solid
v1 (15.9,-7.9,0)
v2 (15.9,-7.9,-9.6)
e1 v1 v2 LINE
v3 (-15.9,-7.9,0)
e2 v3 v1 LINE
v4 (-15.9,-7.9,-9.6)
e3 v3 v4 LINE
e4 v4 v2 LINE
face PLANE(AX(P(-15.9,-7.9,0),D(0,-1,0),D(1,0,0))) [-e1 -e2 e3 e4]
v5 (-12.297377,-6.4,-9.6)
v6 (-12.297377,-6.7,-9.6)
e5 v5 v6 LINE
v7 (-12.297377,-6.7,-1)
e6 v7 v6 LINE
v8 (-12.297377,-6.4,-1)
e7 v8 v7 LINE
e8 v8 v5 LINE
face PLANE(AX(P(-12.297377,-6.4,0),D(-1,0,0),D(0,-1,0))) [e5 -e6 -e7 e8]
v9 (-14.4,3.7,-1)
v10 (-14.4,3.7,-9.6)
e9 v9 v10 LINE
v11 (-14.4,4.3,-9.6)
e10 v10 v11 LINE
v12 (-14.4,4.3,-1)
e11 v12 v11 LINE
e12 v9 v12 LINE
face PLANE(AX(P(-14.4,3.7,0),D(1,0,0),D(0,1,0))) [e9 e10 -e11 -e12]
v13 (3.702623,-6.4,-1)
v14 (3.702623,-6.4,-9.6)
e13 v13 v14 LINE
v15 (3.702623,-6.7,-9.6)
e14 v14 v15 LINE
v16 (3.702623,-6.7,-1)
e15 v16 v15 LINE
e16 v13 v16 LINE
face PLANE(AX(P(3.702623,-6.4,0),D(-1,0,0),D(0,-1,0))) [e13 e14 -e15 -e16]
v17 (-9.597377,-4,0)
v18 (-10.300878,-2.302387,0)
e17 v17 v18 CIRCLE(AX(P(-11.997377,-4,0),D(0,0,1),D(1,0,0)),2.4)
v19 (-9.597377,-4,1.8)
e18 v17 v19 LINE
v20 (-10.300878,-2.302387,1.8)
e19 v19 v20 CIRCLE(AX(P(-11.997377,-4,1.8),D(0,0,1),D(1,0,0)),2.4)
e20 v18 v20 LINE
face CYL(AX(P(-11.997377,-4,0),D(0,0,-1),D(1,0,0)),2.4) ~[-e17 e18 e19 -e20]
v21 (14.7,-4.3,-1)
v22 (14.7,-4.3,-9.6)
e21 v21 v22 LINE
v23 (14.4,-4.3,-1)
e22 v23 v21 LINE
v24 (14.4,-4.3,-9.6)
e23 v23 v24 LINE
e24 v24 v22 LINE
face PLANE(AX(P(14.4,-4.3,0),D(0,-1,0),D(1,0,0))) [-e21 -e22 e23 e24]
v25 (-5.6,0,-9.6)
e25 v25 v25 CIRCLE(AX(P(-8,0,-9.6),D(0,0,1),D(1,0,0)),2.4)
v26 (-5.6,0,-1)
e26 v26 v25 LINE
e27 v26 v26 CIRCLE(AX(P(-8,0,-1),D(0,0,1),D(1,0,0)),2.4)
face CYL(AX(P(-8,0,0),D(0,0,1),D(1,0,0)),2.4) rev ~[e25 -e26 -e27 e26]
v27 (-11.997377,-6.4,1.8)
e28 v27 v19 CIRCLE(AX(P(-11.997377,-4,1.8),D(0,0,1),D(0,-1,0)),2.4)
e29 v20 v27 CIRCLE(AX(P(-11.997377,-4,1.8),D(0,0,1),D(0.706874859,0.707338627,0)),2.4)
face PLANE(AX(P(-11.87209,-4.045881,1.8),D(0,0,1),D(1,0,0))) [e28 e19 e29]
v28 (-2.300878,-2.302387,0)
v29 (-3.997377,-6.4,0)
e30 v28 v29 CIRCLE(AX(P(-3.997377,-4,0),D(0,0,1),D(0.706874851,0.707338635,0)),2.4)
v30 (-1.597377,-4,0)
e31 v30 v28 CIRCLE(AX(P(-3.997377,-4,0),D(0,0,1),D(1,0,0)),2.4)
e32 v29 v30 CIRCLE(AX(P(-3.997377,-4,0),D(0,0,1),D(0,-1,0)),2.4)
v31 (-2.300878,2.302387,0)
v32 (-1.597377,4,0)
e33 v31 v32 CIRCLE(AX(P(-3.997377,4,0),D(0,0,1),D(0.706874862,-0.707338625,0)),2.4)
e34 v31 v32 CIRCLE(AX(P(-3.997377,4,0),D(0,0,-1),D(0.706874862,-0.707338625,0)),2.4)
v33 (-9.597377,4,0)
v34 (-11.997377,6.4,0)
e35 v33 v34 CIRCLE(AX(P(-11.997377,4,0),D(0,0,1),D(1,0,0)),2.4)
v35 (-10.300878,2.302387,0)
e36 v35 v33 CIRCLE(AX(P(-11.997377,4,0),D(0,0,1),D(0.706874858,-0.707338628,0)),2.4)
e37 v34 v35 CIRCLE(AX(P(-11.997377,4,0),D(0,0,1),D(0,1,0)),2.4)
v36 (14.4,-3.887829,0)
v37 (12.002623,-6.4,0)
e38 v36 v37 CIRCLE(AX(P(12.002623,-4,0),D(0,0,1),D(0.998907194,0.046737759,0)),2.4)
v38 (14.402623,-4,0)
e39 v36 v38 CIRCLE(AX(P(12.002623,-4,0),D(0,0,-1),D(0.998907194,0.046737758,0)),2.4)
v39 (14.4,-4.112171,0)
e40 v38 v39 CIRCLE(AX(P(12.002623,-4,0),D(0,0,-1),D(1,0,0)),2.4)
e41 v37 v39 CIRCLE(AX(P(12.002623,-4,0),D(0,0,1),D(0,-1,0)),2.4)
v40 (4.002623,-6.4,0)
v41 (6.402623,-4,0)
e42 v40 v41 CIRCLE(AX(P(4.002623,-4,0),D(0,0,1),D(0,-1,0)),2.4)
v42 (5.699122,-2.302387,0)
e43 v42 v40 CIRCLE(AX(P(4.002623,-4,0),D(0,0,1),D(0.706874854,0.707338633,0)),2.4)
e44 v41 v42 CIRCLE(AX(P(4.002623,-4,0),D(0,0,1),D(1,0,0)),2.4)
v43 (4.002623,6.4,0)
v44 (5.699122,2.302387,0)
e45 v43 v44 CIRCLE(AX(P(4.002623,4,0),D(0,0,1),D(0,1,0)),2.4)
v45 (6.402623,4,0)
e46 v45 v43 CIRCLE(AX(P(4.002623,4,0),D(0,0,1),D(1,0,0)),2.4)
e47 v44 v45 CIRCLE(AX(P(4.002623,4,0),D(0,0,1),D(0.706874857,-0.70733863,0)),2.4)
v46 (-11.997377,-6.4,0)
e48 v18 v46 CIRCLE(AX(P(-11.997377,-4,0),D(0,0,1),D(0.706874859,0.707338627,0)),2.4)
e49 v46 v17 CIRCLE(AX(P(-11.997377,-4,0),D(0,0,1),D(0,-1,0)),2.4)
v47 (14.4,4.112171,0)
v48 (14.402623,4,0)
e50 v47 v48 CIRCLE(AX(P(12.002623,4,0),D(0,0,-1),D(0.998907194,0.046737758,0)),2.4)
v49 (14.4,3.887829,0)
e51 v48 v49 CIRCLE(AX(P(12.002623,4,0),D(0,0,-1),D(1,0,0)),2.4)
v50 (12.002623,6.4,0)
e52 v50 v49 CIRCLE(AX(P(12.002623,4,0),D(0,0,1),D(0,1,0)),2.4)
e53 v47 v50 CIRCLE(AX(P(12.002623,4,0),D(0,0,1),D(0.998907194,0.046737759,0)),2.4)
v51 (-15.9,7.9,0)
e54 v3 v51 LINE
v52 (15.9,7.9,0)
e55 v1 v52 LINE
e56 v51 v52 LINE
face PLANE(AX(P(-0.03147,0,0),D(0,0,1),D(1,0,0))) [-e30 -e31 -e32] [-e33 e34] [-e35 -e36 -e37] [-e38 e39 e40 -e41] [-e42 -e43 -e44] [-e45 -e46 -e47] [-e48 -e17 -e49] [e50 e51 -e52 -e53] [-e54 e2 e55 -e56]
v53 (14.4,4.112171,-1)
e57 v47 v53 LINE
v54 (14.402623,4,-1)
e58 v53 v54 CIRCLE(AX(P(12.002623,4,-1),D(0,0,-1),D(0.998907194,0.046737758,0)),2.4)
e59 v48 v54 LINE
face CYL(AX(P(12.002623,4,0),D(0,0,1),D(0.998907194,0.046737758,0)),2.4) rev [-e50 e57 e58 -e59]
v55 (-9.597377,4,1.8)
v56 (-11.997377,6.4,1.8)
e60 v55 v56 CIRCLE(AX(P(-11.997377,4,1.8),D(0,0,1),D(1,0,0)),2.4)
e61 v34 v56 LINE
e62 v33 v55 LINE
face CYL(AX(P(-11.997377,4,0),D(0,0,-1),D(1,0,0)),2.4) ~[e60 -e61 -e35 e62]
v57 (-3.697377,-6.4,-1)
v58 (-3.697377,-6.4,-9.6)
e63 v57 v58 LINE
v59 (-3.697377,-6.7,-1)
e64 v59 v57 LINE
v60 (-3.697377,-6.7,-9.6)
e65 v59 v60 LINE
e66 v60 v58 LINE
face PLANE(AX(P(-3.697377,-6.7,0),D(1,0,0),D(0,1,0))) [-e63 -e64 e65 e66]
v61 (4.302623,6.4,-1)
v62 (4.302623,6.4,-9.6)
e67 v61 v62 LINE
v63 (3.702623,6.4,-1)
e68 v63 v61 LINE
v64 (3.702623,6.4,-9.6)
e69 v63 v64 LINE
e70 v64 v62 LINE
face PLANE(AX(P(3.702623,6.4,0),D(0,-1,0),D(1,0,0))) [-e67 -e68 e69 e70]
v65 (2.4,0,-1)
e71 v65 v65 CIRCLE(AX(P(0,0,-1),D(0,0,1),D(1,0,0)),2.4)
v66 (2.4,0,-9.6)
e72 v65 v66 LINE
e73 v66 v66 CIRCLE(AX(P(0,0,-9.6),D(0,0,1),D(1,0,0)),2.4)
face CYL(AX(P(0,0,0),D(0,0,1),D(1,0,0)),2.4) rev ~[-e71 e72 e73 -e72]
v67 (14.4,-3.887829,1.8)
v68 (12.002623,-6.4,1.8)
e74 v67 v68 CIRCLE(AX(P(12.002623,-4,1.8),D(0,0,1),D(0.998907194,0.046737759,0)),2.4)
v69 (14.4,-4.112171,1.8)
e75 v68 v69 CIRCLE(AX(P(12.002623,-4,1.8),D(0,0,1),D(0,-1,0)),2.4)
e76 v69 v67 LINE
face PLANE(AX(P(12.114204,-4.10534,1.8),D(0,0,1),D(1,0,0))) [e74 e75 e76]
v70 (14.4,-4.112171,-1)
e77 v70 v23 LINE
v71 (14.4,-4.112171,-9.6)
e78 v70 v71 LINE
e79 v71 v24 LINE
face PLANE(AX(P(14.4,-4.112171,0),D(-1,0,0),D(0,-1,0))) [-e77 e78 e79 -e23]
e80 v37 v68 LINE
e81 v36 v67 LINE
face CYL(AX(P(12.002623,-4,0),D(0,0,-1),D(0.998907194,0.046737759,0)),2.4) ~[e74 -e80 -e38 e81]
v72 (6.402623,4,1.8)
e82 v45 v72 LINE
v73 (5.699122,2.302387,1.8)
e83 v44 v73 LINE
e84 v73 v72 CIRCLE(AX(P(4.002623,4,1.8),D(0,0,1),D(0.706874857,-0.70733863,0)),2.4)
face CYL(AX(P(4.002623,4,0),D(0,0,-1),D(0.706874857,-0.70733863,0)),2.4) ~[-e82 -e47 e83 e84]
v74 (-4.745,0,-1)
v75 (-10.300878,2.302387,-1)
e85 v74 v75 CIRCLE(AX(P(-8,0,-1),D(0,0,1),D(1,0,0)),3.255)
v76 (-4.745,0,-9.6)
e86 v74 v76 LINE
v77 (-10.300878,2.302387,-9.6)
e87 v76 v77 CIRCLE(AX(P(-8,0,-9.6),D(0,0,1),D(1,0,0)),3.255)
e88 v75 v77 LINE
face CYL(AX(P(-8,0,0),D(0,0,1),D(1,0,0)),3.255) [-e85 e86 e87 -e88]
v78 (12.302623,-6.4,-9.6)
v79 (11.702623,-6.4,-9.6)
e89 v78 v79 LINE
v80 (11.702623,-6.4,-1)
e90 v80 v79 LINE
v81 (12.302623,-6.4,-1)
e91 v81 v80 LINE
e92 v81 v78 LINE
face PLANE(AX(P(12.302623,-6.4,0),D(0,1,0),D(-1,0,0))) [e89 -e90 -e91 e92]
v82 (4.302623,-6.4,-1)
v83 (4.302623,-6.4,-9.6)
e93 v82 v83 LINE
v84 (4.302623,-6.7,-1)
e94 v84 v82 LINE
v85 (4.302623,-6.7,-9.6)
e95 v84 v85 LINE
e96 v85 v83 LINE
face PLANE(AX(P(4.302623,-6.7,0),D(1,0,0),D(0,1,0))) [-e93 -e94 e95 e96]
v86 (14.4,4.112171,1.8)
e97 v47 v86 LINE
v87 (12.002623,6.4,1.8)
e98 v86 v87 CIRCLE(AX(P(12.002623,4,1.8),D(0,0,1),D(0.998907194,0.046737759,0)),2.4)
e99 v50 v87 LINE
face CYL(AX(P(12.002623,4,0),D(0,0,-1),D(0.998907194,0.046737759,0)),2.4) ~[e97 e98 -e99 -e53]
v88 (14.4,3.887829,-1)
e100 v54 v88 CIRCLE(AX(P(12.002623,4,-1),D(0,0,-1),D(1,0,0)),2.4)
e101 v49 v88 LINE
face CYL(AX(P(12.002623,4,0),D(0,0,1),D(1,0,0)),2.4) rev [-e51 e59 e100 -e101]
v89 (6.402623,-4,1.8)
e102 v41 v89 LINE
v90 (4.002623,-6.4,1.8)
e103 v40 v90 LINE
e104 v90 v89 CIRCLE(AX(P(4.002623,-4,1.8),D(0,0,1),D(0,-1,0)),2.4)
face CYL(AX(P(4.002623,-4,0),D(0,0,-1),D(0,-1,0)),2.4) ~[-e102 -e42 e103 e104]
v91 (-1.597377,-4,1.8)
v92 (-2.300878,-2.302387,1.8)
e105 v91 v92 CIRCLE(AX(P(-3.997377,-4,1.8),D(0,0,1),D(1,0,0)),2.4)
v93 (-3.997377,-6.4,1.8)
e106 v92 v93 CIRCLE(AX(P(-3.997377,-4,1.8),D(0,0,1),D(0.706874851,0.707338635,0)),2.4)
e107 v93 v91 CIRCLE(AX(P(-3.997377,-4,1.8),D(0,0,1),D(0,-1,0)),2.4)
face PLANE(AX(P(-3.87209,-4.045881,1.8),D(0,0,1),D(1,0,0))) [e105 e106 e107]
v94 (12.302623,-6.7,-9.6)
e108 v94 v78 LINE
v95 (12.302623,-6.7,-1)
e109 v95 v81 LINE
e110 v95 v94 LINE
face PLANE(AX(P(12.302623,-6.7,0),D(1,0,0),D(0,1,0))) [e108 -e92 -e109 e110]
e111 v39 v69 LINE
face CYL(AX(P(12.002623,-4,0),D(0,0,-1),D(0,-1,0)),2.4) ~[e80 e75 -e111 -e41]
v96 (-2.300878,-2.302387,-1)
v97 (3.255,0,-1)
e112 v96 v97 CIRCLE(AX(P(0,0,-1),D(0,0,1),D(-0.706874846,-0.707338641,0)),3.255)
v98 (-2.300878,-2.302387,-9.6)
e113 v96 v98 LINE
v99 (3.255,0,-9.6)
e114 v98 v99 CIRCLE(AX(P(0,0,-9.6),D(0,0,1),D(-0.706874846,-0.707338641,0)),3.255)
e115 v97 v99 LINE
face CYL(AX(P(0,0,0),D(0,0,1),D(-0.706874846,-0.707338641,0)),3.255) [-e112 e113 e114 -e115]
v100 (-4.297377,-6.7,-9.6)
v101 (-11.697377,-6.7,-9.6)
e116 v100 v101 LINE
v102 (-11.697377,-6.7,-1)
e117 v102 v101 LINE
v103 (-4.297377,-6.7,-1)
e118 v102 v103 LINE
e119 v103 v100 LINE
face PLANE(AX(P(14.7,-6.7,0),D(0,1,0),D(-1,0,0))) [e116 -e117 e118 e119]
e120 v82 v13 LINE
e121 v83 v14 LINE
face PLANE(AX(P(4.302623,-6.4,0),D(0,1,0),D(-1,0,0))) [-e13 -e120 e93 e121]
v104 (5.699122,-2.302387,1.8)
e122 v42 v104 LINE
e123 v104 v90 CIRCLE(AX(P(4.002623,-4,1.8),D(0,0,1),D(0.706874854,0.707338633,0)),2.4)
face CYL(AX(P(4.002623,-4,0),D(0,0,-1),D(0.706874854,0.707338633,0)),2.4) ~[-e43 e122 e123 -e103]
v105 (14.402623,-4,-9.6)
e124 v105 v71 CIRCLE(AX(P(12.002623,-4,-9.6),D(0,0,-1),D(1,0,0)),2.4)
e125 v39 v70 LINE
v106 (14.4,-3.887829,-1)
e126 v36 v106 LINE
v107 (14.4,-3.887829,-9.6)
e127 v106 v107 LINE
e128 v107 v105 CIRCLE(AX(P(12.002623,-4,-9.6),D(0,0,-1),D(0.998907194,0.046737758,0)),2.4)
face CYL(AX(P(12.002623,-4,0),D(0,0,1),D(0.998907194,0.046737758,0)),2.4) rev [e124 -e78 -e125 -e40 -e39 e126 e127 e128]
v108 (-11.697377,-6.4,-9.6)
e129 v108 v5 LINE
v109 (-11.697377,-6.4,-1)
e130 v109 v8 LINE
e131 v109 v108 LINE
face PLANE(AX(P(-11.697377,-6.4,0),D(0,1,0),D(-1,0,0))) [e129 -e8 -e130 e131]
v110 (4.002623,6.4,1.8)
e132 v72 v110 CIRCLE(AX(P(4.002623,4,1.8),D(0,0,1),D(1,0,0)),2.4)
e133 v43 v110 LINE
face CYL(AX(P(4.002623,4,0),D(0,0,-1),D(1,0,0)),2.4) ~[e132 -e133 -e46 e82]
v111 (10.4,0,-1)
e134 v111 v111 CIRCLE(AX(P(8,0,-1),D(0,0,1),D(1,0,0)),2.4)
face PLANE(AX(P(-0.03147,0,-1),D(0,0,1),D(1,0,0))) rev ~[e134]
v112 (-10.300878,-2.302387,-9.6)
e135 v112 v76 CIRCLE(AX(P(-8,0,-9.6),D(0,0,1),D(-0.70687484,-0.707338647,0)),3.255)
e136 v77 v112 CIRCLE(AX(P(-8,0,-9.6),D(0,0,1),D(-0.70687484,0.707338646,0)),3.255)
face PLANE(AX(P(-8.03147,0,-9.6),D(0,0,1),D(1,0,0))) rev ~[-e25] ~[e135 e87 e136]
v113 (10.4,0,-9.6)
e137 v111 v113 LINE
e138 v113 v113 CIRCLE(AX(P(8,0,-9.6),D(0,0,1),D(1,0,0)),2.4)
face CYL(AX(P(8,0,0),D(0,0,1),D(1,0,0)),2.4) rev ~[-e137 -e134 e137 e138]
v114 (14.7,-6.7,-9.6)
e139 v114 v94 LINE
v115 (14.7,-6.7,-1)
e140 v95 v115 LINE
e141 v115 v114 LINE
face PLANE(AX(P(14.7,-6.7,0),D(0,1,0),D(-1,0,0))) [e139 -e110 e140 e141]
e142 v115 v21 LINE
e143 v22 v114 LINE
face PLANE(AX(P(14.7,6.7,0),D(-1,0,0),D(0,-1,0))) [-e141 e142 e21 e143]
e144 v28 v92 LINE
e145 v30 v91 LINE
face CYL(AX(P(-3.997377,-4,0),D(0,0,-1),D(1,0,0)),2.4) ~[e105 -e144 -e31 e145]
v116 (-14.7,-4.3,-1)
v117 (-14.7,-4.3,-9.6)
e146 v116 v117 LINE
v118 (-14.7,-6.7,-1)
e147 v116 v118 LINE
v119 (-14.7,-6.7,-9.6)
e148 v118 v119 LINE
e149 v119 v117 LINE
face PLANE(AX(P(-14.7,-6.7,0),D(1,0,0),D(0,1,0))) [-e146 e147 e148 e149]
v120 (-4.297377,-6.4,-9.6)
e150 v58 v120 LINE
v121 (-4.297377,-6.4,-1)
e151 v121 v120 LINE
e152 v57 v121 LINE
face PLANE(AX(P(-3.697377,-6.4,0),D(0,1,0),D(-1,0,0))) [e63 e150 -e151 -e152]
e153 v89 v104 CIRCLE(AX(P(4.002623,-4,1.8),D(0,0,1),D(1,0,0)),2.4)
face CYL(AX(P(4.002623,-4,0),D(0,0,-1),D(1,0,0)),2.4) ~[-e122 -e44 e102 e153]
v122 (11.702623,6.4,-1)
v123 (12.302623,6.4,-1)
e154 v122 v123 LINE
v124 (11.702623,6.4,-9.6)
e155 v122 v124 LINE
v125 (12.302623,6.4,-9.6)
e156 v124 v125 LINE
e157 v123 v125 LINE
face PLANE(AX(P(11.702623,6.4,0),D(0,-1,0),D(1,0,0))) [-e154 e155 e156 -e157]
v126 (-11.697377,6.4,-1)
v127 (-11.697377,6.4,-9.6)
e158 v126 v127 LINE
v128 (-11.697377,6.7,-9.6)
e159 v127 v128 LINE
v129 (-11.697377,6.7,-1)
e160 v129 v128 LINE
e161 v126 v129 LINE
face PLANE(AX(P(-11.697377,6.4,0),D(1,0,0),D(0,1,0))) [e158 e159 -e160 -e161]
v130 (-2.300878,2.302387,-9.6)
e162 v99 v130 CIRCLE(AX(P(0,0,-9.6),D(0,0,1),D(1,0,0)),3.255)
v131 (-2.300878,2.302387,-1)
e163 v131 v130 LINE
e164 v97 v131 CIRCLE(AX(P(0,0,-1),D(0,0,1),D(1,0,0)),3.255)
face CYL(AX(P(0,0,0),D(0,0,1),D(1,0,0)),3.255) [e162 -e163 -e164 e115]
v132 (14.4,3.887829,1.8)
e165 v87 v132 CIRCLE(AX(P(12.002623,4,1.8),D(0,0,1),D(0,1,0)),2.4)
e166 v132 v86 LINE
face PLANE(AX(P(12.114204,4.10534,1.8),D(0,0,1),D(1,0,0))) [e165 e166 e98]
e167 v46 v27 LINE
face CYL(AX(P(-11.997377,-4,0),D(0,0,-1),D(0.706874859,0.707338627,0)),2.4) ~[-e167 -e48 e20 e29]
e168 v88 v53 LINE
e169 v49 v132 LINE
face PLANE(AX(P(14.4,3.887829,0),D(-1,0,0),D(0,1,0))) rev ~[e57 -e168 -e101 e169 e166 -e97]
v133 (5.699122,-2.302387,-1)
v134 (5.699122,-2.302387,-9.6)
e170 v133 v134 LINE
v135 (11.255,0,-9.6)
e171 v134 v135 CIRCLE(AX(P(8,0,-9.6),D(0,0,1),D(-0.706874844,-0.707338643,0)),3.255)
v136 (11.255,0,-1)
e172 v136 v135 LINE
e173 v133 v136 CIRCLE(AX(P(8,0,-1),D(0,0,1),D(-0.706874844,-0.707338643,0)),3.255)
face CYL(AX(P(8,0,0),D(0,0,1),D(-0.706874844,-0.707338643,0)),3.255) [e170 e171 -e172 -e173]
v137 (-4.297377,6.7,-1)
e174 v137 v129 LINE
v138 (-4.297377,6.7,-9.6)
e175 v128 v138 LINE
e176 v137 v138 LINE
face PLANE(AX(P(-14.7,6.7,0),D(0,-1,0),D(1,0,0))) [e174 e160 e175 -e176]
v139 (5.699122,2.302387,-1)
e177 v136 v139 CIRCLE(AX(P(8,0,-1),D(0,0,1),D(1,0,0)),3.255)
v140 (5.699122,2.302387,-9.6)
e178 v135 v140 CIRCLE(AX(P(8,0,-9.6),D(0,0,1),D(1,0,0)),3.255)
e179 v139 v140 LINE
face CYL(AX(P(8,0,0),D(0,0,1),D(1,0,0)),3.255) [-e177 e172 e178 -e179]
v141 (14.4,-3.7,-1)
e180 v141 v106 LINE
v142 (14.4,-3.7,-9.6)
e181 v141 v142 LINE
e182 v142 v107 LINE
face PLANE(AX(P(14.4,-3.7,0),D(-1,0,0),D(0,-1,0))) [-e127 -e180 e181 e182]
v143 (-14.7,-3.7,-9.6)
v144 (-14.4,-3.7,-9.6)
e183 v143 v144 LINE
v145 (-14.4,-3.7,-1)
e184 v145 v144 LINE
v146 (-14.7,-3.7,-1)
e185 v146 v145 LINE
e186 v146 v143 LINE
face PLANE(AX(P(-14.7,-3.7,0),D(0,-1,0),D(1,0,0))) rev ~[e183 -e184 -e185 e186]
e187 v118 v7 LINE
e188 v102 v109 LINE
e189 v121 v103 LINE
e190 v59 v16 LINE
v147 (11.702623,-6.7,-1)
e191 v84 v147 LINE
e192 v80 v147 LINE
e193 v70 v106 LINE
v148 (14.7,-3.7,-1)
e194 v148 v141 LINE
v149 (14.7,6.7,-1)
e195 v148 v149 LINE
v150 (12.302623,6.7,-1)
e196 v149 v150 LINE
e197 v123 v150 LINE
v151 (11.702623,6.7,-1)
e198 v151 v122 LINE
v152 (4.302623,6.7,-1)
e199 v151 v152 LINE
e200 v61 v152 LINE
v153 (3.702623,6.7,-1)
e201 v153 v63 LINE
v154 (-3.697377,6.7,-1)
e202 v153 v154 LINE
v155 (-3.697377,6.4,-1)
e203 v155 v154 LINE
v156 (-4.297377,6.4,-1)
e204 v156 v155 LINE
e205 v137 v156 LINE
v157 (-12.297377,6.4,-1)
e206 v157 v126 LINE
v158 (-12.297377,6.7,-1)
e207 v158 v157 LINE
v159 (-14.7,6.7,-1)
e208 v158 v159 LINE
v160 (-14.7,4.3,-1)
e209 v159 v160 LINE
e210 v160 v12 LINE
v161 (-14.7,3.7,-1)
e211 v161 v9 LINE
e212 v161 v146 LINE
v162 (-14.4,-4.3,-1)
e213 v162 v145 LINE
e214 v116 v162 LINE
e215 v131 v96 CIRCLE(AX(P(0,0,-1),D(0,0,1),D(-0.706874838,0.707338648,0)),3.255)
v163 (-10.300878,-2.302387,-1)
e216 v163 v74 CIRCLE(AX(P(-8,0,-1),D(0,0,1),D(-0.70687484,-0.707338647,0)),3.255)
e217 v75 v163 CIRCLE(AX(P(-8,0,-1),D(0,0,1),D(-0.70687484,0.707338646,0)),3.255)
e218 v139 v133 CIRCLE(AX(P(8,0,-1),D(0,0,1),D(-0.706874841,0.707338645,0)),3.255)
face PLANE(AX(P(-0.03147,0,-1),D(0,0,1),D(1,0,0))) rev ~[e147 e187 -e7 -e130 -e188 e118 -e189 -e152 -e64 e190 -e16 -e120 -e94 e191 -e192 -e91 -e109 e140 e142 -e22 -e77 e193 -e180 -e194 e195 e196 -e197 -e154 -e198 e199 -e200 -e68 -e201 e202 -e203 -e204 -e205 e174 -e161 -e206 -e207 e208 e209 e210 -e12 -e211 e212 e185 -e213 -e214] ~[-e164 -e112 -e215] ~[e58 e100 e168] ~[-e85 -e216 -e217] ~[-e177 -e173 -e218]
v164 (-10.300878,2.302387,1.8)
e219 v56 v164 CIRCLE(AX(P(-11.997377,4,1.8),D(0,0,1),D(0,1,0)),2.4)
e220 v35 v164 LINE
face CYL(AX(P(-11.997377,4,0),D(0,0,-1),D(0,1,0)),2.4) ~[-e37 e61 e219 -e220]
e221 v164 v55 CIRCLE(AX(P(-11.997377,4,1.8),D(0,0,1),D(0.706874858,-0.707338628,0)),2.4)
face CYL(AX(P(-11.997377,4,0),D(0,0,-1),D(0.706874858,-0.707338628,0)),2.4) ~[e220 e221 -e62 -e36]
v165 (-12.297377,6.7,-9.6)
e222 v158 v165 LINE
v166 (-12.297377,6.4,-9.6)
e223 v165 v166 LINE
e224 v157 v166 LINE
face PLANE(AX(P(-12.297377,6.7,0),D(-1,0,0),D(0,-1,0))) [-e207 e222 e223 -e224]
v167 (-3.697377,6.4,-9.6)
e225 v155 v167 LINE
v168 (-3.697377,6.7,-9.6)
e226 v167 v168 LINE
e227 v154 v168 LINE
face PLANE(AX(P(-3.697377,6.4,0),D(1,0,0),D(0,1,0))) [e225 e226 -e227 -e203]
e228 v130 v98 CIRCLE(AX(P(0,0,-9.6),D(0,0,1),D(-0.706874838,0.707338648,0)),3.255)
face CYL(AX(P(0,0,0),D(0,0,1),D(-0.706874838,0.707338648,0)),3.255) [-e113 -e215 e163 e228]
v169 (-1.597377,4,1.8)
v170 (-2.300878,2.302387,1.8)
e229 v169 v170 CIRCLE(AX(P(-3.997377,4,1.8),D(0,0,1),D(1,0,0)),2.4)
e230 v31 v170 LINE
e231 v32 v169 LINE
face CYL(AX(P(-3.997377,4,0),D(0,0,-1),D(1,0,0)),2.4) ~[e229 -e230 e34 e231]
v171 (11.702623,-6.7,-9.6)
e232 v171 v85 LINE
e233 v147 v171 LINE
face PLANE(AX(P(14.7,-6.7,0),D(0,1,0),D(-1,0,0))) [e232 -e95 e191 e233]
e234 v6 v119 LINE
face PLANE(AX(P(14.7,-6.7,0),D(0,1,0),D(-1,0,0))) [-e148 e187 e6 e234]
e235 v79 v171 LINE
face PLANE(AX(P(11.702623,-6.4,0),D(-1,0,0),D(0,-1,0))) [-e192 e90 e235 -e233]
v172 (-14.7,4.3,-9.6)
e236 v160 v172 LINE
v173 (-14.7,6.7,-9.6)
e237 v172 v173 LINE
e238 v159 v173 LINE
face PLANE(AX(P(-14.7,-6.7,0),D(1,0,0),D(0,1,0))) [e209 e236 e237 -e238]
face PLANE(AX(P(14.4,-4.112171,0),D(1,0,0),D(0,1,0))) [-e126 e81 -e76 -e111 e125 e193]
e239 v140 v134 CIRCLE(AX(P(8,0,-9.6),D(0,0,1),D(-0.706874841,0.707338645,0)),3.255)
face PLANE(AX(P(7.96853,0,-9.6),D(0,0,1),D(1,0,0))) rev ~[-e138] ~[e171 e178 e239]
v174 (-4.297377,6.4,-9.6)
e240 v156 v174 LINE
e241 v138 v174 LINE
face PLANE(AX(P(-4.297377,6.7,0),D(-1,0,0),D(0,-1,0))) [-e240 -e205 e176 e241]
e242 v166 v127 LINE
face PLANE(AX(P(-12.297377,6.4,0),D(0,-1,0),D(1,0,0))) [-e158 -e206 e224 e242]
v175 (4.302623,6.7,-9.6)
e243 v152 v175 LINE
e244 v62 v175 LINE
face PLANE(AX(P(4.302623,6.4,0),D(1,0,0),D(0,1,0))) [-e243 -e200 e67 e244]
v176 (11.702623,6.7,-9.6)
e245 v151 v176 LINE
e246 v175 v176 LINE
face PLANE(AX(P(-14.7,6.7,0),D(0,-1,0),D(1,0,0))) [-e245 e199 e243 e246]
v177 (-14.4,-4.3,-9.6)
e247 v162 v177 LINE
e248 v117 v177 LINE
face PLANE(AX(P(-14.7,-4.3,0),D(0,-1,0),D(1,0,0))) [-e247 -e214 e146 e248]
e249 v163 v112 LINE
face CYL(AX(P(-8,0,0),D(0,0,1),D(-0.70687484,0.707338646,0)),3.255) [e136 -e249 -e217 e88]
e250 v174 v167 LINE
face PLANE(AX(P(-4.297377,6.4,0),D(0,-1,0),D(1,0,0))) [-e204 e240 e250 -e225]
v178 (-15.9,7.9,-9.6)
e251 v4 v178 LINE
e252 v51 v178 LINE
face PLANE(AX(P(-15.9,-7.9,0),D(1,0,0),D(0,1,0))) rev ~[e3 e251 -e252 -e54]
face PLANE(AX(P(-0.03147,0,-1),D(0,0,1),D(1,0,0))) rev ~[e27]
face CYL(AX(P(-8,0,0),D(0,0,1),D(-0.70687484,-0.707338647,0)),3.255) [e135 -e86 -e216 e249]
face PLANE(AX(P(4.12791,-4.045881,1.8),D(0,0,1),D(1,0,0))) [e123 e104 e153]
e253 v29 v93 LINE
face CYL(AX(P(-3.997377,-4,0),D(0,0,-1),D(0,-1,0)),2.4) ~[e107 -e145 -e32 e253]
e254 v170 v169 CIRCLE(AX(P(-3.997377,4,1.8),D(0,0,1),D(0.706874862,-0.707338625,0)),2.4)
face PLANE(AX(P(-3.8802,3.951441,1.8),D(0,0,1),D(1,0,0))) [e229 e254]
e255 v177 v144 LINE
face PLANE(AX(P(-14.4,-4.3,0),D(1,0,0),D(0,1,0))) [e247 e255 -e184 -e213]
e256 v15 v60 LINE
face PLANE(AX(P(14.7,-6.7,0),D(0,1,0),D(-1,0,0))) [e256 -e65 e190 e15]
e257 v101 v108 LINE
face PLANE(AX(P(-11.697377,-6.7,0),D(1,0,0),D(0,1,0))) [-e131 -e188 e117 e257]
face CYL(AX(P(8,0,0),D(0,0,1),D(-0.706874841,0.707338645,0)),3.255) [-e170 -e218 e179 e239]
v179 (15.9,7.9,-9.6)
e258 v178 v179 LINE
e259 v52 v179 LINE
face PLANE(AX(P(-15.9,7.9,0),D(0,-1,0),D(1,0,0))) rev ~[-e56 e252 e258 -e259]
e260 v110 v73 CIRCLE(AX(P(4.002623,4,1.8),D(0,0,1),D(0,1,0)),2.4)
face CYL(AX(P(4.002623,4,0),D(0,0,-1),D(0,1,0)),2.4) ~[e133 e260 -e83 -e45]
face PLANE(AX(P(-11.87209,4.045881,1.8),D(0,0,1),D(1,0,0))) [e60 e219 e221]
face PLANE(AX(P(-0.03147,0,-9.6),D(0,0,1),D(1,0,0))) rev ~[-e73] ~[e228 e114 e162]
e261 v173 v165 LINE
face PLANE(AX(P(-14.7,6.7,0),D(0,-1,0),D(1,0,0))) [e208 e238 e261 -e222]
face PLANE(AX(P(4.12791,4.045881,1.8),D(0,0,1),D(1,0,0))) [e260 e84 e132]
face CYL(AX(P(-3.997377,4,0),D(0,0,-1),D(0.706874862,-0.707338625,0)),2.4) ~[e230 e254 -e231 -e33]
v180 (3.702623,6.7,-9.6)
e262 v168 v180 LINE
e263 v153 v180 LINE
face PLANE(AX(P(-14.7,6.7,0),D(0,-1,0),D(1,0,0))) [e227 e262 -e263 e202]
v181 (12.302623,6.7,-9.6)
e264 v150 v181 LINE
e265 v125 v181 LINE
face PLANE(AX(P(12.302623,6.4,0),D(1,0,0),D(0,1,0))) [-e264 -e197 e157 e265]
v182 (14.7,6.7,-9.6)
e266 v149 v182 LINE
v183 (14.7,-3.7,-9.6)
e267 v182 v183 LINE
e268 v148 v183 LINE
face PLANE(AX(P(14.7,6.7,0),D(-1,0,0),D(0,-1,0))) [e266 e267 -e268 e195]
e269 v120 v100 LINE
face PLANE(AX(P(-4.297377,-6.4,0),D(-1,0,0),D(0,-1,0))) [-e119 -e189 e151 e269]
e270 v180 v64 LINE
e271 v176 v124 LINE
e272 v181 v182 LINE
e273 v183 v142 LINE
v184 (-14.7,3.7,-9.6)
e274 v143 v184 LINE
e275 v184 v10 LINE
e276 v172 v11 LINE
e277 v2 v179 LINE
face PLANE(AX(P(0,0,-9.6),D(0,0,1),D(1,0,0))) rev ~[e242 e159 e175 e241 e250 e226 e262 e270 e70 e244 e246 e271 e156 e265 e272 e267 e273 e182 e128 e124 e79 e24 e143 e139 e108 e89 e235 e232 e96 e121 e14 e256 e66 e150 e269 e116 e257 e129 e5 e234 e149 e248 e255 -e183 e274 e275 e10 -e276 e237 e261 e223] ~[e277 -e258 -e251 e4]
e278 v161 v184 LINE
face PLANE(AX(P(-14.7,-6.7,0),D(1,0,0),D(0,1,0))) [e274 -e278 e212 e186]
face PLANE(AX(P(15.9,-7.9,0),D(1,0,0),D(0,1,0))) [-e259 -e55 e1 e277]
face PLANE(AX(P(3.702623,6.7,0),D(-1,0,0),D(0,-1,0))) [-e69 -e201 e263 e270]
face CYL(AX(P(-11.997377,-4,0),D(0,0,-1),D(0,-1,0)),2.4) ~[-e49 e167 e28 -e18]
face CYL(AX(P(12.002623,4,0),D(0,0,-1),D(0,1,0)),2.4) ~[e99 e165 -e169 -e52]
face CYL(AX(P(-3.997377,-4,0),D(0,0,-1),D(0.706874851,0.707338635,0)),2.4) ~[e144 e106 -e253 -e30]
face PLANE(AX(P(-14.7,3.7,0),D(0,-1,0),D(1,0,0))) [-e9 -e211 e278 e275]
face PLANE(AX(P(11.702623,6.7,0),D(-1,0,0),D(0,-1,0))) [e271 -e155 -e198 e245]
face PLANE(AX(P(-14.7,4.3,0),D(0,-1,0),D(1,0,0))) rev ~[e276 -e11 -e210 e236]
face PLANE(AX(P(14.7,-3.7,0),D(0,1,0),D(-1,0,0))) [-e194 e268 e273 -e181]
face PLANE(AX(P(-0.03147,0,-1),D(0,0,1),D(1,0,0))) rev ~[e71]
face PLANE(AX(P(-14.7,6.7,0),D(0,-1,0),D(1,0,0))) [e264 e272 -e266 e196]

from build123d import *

# Parameters (mm, degrees)
F0_W     = 31.8
F0_H     = 15.8
F1_DEPTH = 9.6
F0_R     = 2.4
F0_W_2   = 0.3
F0_H_2   = 0.6
F2_DEPTH = 1
F3_DEPTH = 1.8
F4_DEPTH = 9.6


# Not quite as in the source:
# - a feature of the source that left no trace in its solid (it failed there, or was rolled back) is left out


with BuildPart() as f1:
    # F0 (on Top) → F1 (new body)
    with BuildSketch(Plane.XY):
        Rectangle(F0_W, F0_H)
        Polygon((-11.6973772652, 6.7), (-4.2973772652, 6.7), (-3.6973772652, 6.7), (3.7026227348, 6.7), (4.3026227348, 6.7), (11.7026227348, 6.7), (12.3026227348, 6.7), (14.7, 6.7), (14.7, 4.3), (14.7, 3.7), (14.7, -3.7), (14.7, -4.3), (14.7, -6.7), (12.3026227348, -6.7), (11.7026227348, -6.7), (4.3026227348, -6.7), (3.7026227348, -6.7), (-3.6973772652, -6.7), (-4.2973772652, -6.7), (-11.6973772652, -6.7), (-12.2973772652, -6.7), (-14.7, -6.7), (-14.7, -4.3), (-14.7, -3.7), (-14.7, 3.7), (-14.7, 4.3), (-14.7, 6.7), (-12.2973772652, 6.7), align=None, mode=Mode.SUBTRACT)
    extrude(amount=-F1_DEPTH)

    # F0 (on Top) → F2 (join)
    with BuildSketch(Plane.XY):
        with BuildLine():
            ThreePointArc((-2.3008776231, -2.3023872749), (1.2461276694, -3.0070235835), (3.255, 0))
            ThreePointArc((3.255, 0), (1.2461276864, 3.0070235764), (-2.3008775971, 2.3023873009))
            ThreePointArc((-2.3008775971, 2.3023873009), (-3.255, 1.84e-08), (-2.3008776231, -2.3023872749))
        make_face()
        Circle(F0_R, mode=Mode.SUBTRACT)
        with BuildLine():
            ThreePointArc((-2.3008775971, 2.3023873009), (1.2461276864, 3.0070235764), (3.255, 0))
            ThreePointArc((3.255, 0), (1.2461276694, -3.0070235835), (-2.3008776231, -2.3023872749))
            ThreePointArc((-2.3008776231, -2.3023872749), (-1.780217016, -3.0811961964), (-1.5973772652, -4))
            ThreePointArc((-1.5973772652, -4), (-2.3003209903, -5.6970562748), (-3.9973772652, -6.4))
            Line((-3.9973772652, -6.4), (-3.6973772652, -6.4))
            Line((-3.6973772652, -6.4), (-3.6973772652, -6.7))
            Line((-3.6973772652, -6.7), (3.7026227348, -6.7))
            Line((3.7026227348, -6.7), (3.7026227348, -6.4))
            Line((3.7026227348, -6.4), (4.0026227348, -6.4))
            ThreePointArc((4.0026227348, -6.4), (1.7851612895, -3.0819233484), (5.6991223839, -2.3023872819))
            ThreePointArc((5.6991223839, -2.3023872819), (4.745, 5e-09), (5.699122391, 2.3023872889))
            ThreePointArc((5.699122391, 2.3023872889), (1.7851612914, 3.0819233438), (4.0026227348, 6.4))
            Line((4.0026227348, 6.4), (3.7026227348, 6.4))
            Line((3.7026227348, 6.4), (3.7026227348, 6.7))
            Line((3.7026227348, 6.7), (-3.6973772652, 6.7))
            Line((-3.6973772652, 6.7), (-3.6973772652, 6.4))
            Line((-3.6973772652, 6.4), (-3.9973772652, 6.4))
            ThreePointArc((-3.9973772652, 6.4), (-2.3003209903, 5.6970562748), (-1.5973772652, 4))
            ThreePointArc((-1.5973772652, 4), (-1.7802170089, 3.0811962134), (-2.3008775971, 2.3023873009))
        make_face()
        with BuildLine():
            ThreePointArc((-2.3008776231, -2.3023872749), (-3.255, 1.84e-08), (-2.3008775971, 2.3023873009))
            ThreePointArc((-2.3008775971, 2.3023873009), (-6.2148387054, 3.0819233359), (-3.9973772652, 6.4))
            Line((-3.9973772652, 6.4), (-4.2973772652, 6.4))
            Line((-4.2973772652, 6.4), (-4.2973772652, 6.7))
            Line((-4.2973772652, 6.7), (-11.6973772652, 6.7))
            Line((-11.6973772652, 6.7), (-11.6973772652, 6.4))
            Line((-11.6973772652, 6.4), (-11.9973772652, 6.4))
            ThreePointArc((-11.9973772652, 6.4), (-10.3003209903, 5.6970562748), (-9.5973772652, 4))
            ThreePointArc((-9.5973772652, 4), (-9.780217011, 3.0811962084), (-10.3008776047, 2.3023872933))
            ThreePointArc((-10.3008776047, 2.3023872933), (-6.7538723186, 3.0070235785), (-4.745, 0))
            ThreePointArc((-4.745, 0), (-6.7538723174, -3.007023578), (-10.3008776029, -2.3023872951))
            ThreePointArc((-10.3008776029, -2.3023872951), (-9.7802170105, -3.0811962096), (-9.5973772652, -4))
            ThreePointArc((-9.5973772652, -4), (-10.3003209903, -5.6970562748), (-11.9973772652, -6.4))
            Line((-11.9973772652, -6.4), (-11.6973772652, -6.4))
            Line((-11.6973772652, -6.4), (-11.6973772652, -6.7))
            Line((-11.6973772652, -6.7), (-4.2973772652, -6.7))
            Line((-4.2973772652, -6.7), (-4.2973772652, -6.4))
            Line((-4.2973772652, -6.4), (-3.9973772652, -6.4))
            ThreePointArc((-3.9973772652, -6.4), (-6.2148387124, -3.0819233529), (-2.3008776231, -2.3023872749))
        make_face()
        with BuildLine():
            ThreePointArc((-3.9973772652, 6.4), (-6.2148387054, 3.0819233359), (-2.3008775971, 2.3023873009))
            ThreePointArc((-2.3008775971, 2.3023873009), (-1.7802170089, 3.0811962134), (-1.5973772652, 4))
            ThreePointArc((-1.5973772652, 4), (-2.3003209903, 5.6970562748), (-3.9973772652, 6.4))
        make_face()
        with BuildLine():
            ThreePointArc((-1.5973772652, -4), (-1.780217016, -3.0811961964), (-2.3008776231, -2.3023872749))
            ThreePointArc((-2.3008776231, -2.3023872749), (-6.2148387124, -3.0819233529), (-3.9973772652, -6.4))
            ThreePointArc((-3.9973772652, -6.4), (-2.3003209903, -5.6970562748), (-1.5973772652, -4))
        make_face()
        Polygon((-4.2973772652, 6.4), (-3.9973772652, 6.4), (-3.6973772652, 6.4), (-3.6973772652, 6.7), (-4.2973772652, 6.7), align=None)
        Polygon((-3.6973772652, -6.4), (-3.9973772652, -6.4), (-4.2973772652, -6.4), (-4.2973772652, -6.7), (-3.6973772652, -6.7), align=None)
        Polygon((-11.6973772652, 6.4), (-11.6973772652, 6.7), (-12.2973772652, 6.7), (-12.2973772652, 6.4), (-11.9973772652, 6.4), align=None)
        Polygon((4.3026227348, 6.7), (3.7026227348, 6.7), (3.7026227348, 6.4), (4.0026227348, 6.4), (4.3026227348, 6.4), align=None)
        Polygon((-12.2973772652, -6.7), (-11.6973772652, -6.7), (-11.6973772652, -6.4), (-11.9973772652, -6.4), (-12.2973772652, -6.4), align=None)
        Polygon((3.7026227348, -6.4), (3.7026227348, -6.7), (4.3026227348, -6.7), (4.3026227348, -6.4), (4.0026227348, -6.4), align=None)
        with BuildLine():
            Line((-12.2973772652, 6.4), (-12.2973772652, 6.7))
            Line((-12.2973772652, 6.7), (-14.7, 6.7))
            Line((-14.7, 6.7), (-14.7, 4.3))
            Line((-14.7, 4.3), (-14.4, 4.3))
            Line((-14.4, 4.3), (-14.4, 3.7))
            Line((-14.4, 3.7), (-14.7, 3.7))
            Line((-14.7, 3.7), (-14.7, -3.7))
            Line((-14.7, -3.7), (-14.4, -3.7))
            Line((-14.4, -3.7), (-14.4, -4.3))
            Line((-14.4, -4.3), (-14.7, -4.3))
            Line((-14.7, -4.3), (-14.7, -6.7))
            Line((-14.7, -6.7), (-12.2973772652, -6.7))
            Line((-12.2973772652, -6.7), (-12.2973772652, -6.4))
            Line((-12.2973772652, -6.4), (-11.9973772652, -6.4))
            ThreePointArc((-11.9973772652, -6.4), (-14.214838707, -3.0819233398), (-10.3008776029, -2.3023872951))
            ThreePointArc((-10.3008776029, -2.3023872951), (-11.255, -1.3e-09), (-10.3008776047, 2.3023872933))
            ThreePointArc((-10.3008776047, 2.3023872933), (-14.2148387075, 3.0819233409), (-11.9973772652, 6.4))
            Line((-11.9973772652, 6.4), (-12.2973772652, 6.4))
        make_face()
        with BuildLine():
            Line((11.7026227348, 6.7), (4.3026227348, 6.7))
            Line((4.3026227348, 6.7), (4.3026227348, 6.4))
            Line((4.3026227348, 6.4), (4.0026227348, 6.4))
            ThreePointArc((4.0026227348, 6.4), (5.6996790097, 5.6970562748), (6.4026227348, 4))
            ThreePointArc((6.4026227348, 4), (6.2197829878, 3.0811962056), (5.699122391, 2.3023872889))
            ThreePointArc((5.699122391, 2.3023872889), (9.2461276786, 3.0070235797), (11.255, 0))
            ThreePointArc((11.255, 0), (9.246127674, -3.0070235816), (5.6991223839, -2.3023872819))
            ThreePointArc((5.6991223839, -2.3023872819), (6.2197829859, -3.081196201), (6.4026227348, -4))
            ThreePointArc((6.4026227348, -4), (5.6996790097, -5.6970562748), (4.0026227348, -6.4))
            Line((4.0026227348, -6.4), (4.3026227348, -6.4))
            Line((4.3026227348, -6.4), (4.3026227348, -6.7))
            Line((4.3026227348, -6.7), (11.7026227348, -6.7))
            Line((11.7026227348, -6.7), (11.7026227348, -6.4))
            Line((11.7026227348, -6.4), (12.0026227348, -6.4))
            ThreePointArc((12.0026227348, -6.4), (10.2663610188, -2.3430765699), (14.4, -3.8878293777))
            Line((14.4, -3.8878293777), (14.4, -3.7))
            Line((14.4, -3.7), (14.7, -3.7))
            Line((14.7, -3.7), (14.7, 3.7))
            Line((14.7, 3.7), (14.4, 3.7))
            Line((14.4, 3.7), (14.4, 3.8878293777))
            ThreePointArc((14.4, 3.8878293777), (10.2663610188, 2.3430765699), (12.0026227348, 6.4))
            Line((12.0026227348, 6.4), (11.7026227348, 6.4))
            Line((11.7026227348, 6.4), (11.7026227348, 6.7))
        make_face()
        with BuildLine():
            ThreePointArc((-9.5973772652, 4), (-10.3003209903, 5.6970562748), (-11.9973772652, 6.4))
            ThreePointArc((-11.9973772652, 6.4), (-14.2148387075, 3.0819233409), (-10.3008776047, 2.3023872933))
            ThreePointArc((-10.3008776047, 2.3023872933), (-9.780217011, 3.0811962084), (-9.5973772652, 4))
        make_face()
        Polygon((12.3026227348, 6.7), (11.7026227348, 6.7), (11.7026227348, 6.4), (12.0026227348, 6.4), (12.3026227348, 6.4), align=None)
        with BuildLine():
            ThreePointArc((6.4026227348, 4), (5.6996790097, 5.6970562748), (4.0026227348, 6.4))
            ThreePointArc((4.0026227348, 6.4), (1.7851612914, 3.0819233438), (5.699122391, 2.3023872889))
            ThreePointArc((5.699122391, 2.3023872889), (6.2197829878, 3.0811962056), (6.4026227348, 4))
        make_face()
        with BuildLine():
            ThreePointArc((-10.3008776029, -2.3023872951), (-14.214838707, -3.0819233398), (-11.9973772652, -6.4))
            ThreePointArc((-11.9973772652, -6.4), (-10.3003209903, -5.6970562748), (-9.5973772652, -4))
            ThreePointArc((-9.5973772652, -4), (-9.7802170105, -3.0811962096), (-10.3008776029, -2.3023872951))
        make_face()
        Polygon((11.7026227348, -6.4), (11.7026227348, -6.7), (12.3026227348, -6.7), (12.3026227348, -6.4), (12.0026227348, -6.4), align=None)
        with BuildLine():
            ThreePointArc((5.6991223839, -2.3023872819), (1.7851612895, -3.0819233484), (4.0026227348, -6.4))
            ThreePointArc((4.0026227348, -6.4), (5.6996790097, -5.6970562748), (6.4026227348, -4))
            ThreePointArc((6.4026227348, -4), (6.2197829859, -3.081196201), (5.6991223839, -2.3023872819))
        make_face()
        with Locations((-14.55, 4)):
            Rectangle(F0_W_2, F0_H_2)
        with BuildLine():
            ThreePointArc((-4.745, 0), (-6.7538723186, 3.0070235785), (-10.3008776047, 2.3023872933))
            ThreePointArc((-10.3008776047, 2.3023872933), (-11.255, -1.3e-09), (-10.3008776029, -2.3023872951))
            ThreePointArc((-10.3008776029, -2.3023872951), (-6.7538723174, -3.007023578), (-4.745, 0))
        make_face()
        with Locations((-8, 0)):
            Circle(F0_R, mode=Mode.SUBTRACT)
        with BuildLine():
            Line((14.7, 6.7), (12.3026227348, 6.7))
            Line((12.3026227348, 6.7), (12.3026227348, 6.4))
            Line((12.3026227348, 6.4), (12.0026227348, 6.4))
            ThreePointArc((12.0026227348, 6.4), (13.659546165, 5.7362617161), (14.4, 4.1121706223))
            Line((14.4, 4.1121706223), (14.4, 4.3))
            Line((14.4, 4.3), (14.7, 4.3))
            Line((14.7, 4.3), (14.7, 6.7))
        make_face()
        with BuildLine():
            ThreePointArc((11.255, 0), (9.2461276786, 3.0070235797), (5.699122391, 2.3023872889))
            ThreePointArc((5.699122391, 2.3023872889), (4.745, 5e-09), (5.6991223839, -2.3023872819))
            ThreePointArc((5.6991223839, -2.3023872819), (9.246127674, -3.0070235816), (11.255, 0))
        make_face()
        with Locations((8, 0)):
            Circle(F0_R, mode=Mode.SUBTRACT)
        with Locations((-14.55, -4)):
            Rectangle(F0_W_2, F0_H_2)
        with BuildLine():
            Line((12.3026227348, -6.4), (12.3026227348, -6.7))
            Line((12.3026227348, -6.7), (14.7, -6.7))
            Line((14.7, -6.7), (14.7, -4.3))
            Line((14.7, -4.3), (14.4, -4.3))
            Line((14.4, -4.3), (14.4, -4.1121706223))
            ThreePointArc((14.4, -4.1121706223), (13.659546165, -5.7362617161), (12.0026227348, -6.4))
            Line((12.0026227348, -6.4), (12.3026227348, -6.4))
        make_face()
        with BuildLine():
            ThreePointArc((14.4, 4.1121706223), (13.659546165, 5.7362617161), (12.0026227348, 6.4))
            ThreePointArc((12.0026227348, 6.4), (10.2663610188, 2.3430765699), (14.4, 3.8878293777))
            Line((14.4, 3.8878293777), (14.4, 4.1121706223))
        make_face()
        with BuildLine():
            ThreePointArc((14.4, -3.8878293777), (10.2663610188, -2.3430765699), (12.0026227348, -6.4))
            ThreePointArc((12.0026227348, -6.4), (13.659546165, -5.7362617161), (14.4, -4.1121706223))
            Line((14.4, -4.1121706223), (14.4, -3.8878293777))
        make_face()
        with BuildLine():
            Line((14.7, 3.7), (14.7, 4.3))
            Line((14.7, 4.3), (14.4, 4.3))
            Line((14.4, 4.3), (14.4, 4.1121706223))
            ThreePointArc((14.4, 4.1121706223), (14.4019669615, 4.05610064), (14.4026227348, 4))
            ThreePointArc((14.4026227348, 4), (14.4019669615, 3.94389936), (14.4, 3.8878293777))
            Line((14.4, 3.8878293777), (14.4, 3.7))
            Line((14.4, 3.7), (14.7, 3.7))
        make_face()
        with BuildLine():
            Line((14.4, -4.3), (14.7, -4.3))
            Line((14.7, -4.3), (14.7, -3.7))
            Line((14.7, -3.7), (14.4, -3.7))
            Line((14.4, -3.7), (14.4, -3.8878293777))
            ThreePointArc((14.4, -3.8878293777), (14.4019669615, -3.94389936), (14.4026227348, -4))
            ThreePointArc((14.4026227348, -4), (14.4019669615, -4.05610064), (14.4, -4.1121706223))
            Line((14.4, -4.1121706223), (14.4, -4.3))
        make_face()
        Circle(F0_R)
        with Locations((8, 0)):
            Circle(F0_R)
        with Locations((-8, 0)):
            Circle(F0_R)
    extrude(amount=-F2_DEPTH)

    # F0 (on Top) → F3 (join)
    with BuildSketch(Plane.XY):
        with BuildLine():
            ThreePointArc((-3.9973772652, 6.4), (-6.2148387054, 3.0819233359), (-2.3008775971, 2.3023873009))
            ThreePointArc((-2.3008775971, 2.3023873009), (-1.7802170089, 3.0811962134), (-1.5973772652, 4))
            ThreePointArc((-1.5973772652, 4), (-2.3003209903, 5.6970562748), (-3.9973772652, 6.4))
        make_face()
        with BuildLine():
            ThreePointArc((-1.5973772652, -4), (-1.780217016, -3.0811961964), (-2.3008776231, -2.3023872749))
            ThreePointArc((-2.3008776231, -2.3023872749), (-6.2148387124, -3.0819233529), (-3.9973772652, -6.4))
            ThreePointArc((-3.9973772652, -6.4), (-2.3003209903, -5.6970562748), (-1.5973772652, -4))
        make_face()
        with BuildLine():
            ThreePointArc((-9.5973772652, 4), (-10.3003209903, 5.6970562748), (-11.9973772652, 6.4))
            ThreePointArc((-11.9973772652, 6.4), (-14.2148387075, 3.0819233409), (-10.3008776047, 2.3023872933))
            ThreePointArc((-10.3008776047, 2.3023872933), (-9.780217011, 3.0811962084), (-9.5973772652, 4))
        make_face()
        with BuildLine():
            ThreePointArc((6.4026227348, 4), (5.6996790097, 5.6970562748), (4.0026227348, 6.4))
            ThreePointArc((4.0026227348, 6.4), (1.7851612914, 3.0819233438), (5.699122391, 2.3023872889))
            ThreePointArc((5.699122391, 2.3023872889), (6.2197829878, 3.0811962056), (6.4026227348, 4))
        make_face()
        with BuildLine():
            ThreePointArc((-10.3008776029, -2.3023872951), (-14.214838707, -3.0819233398), (-11.9973772652, -6.4))
            ThreePointArc((-11.9973772652, -6.4), (-10.3003209903, -5.6970562748), (-9.5973772652, -4))
            ThreePointArc((-9.5973772652, -4), (-9.7802170105, -3.0811962096), (-10.3008776029, -2.3023872951))
        make_face()
        with BuildLine():
            ThreePointArc((5.6991223839, -2.3023872819), (1.7851612895, -3.0819233484), (4.0026227348, -6.4))
            ThreePointArc((4.0026227348, -6.4), (5.6996790097, -5.6970562748), (6.4026227348, -4))
            ThreePointArc((6.4026227348, -4), (6.2197829859, -3.081196201), (5.6991223839, -2.3023872819))
        make_face()
        with BuildLine():
            ThreePointArc((14.4, 4.1121706223), (13.659546165, 5.7362617161), (12.0026227348, 6.4))
            ThreePointArc((12.0026227348, 6.4), (10.2663610188, 2.3430765699), (14.4, 3.8878293777))
            Line((14.4, 3.8878293777), (14.4, 4.1121706223))
        make_face()
        with BuildLine():
            ThreePointArc((14.4, -3.8878293777), (10.2663610188, -2.3430765699), (12.0026227348, -6.4))
            ThreePointArc((12.0026227348, -6.4), (13.659546165, -5.7362617161), (14.4, -4.1121706223))
            Line((14.4, -4.1121706223), (14.4, -3.8878293777))
        make_face()
    extrude(amount=F3_DEPTH)

    # F0 (on Top) → F4 (join)
    with BuildSketch(Plane.XY):
        Polygon((11.7026227348, -6.4), (11.7026227348, -6.7), (12.3026227348, -6.7), (12.3026227348, -6.4), (12.0026227348, -6.4), align=None)
        Polygon((12.3026227348, 6.7), (11.7026227348, 6.7), (11.7026227348, 6.4), (12.0026227348, 6.4), (12.3026227348, 6.4), align=None)
        Polygon((4.3026227348, 6.7), (3.7026227348, 6.7), (3.7026227348, 6.4), (4.0026227348, 6.4), (4.3026227348, 6.4), align=None)
        Polygon((-4.2973772652, 6.4), (-3.9973772652, 6.4), (-3.6973772652, 6.4), (-3.6973772652, 6.7), (-4.2973772652, 6.7), align=None)
        Polygon((-11.6973772652, 6.4), (-11.6973772652, 6.7), (-12.2973772652, 6.7), (-12.2973772652, 6.4), (-11.9973772652, 6.4), align=None)
        with Locations((-14.55, 4)):
            Rectangle(F0_W_2, F0_H_2)
        with Locations((-14.55, -4)):
            Rectangle(F0_W_2, F0_H_2)
        Polygon((-12.2973772652, -6.7), (-11.6973772652, -6.7), (-11.6973772652, -6.4), (-11.9973772652, -6.4), (-12.2973772652, -6.4), align=None)
        Polygon((-3.6973772652, -6.4), (-3.9973772652, -6.4), (-4.2973772652, -6.4), (-4.2973772652, -6.7), (-3.6973772652, -6.7), align=None)
        Polygon((3.7026227348, -6.4), (3.7026227348, -6.7), (4.3026227348, -6.7), (4.3026227348, -6.4), (4.0026227348, -6.4), align=None)
        with BuildLine():
            ThreePointArc((11.255, 0), (9.2461276786, 3.0070235797), (5.699122391, 2.3023872889))
            ThreePointArc((5.699122391, 2.3023872889), (4.745, 5e-09), (5.6991223839, -2.3023872819))
            ThreePointArc((5.6991223839, -2.3023872819), (9.246127674, -3.0070235816), (11.255, 0))
        make_face()
        with Locations((8, 0)):
            Circle(F0_R, mode=Mode.SUBTRACT)
        with BuildLine():
            ThreePointArc((-2.3008776231, -2.3023872749), (1.2461276694, -3.0070235835), (3.255, 0))
            ThreePointArc((3.255, 0), (1.2461276864, 3.0070235764), (-2.3008775971, 2.3023873009))
            ThreePointArc((-2.3008775971, 2.3023873009), (-3.255, 1.84e-08), (-2.3008776231, -2.3023872749))
        make_face()
        Circle(F0_R, mode=Mode.SUBTRACT)
        with BuildLine():
            ThreePointArc((-4.745, 0), (-6.7538723186, 3.0070235785), (-10.3008776047, 2.3023872933))
            ThreePointArc((-10.3008776047, 2.3023872933), (-11.255, -1.3e-09), (-10.3008776029, -2.3023872951))
            ThreePointArc((-10.3008776029, -2.3023872951), (-6.7538723174, -3.007023578), (-4.745, 0))
        make_face()
        with Locations((-8, 0)):
            Circle(F0_R, mode=Mode.SUBTRACT)
        with BuildLine():
            Line((14.4, -4.3), (14.7, -4.3))
            Line((14.7, -4.3), (14.7, -3.7))
            Line((14.7, -3.7), (14.4, -3.7))
            Line((14.4, -3.7), (14.4, -3.8878293777))
            ThreePointArc((14.4, -3.8878293777), (14.4019669615, -3.94389936), (14.4026227348, -4))
            ThreePointArc((14.4026227348, -4), (14.4019669615, -4.05610064), (14.4, -4.1121706223))
            Line((14.4, -4.1121706223), (14.4, -4.3))
        make_face()
    extrude(amount=-F4_DEPTH)


solid = f1.part
